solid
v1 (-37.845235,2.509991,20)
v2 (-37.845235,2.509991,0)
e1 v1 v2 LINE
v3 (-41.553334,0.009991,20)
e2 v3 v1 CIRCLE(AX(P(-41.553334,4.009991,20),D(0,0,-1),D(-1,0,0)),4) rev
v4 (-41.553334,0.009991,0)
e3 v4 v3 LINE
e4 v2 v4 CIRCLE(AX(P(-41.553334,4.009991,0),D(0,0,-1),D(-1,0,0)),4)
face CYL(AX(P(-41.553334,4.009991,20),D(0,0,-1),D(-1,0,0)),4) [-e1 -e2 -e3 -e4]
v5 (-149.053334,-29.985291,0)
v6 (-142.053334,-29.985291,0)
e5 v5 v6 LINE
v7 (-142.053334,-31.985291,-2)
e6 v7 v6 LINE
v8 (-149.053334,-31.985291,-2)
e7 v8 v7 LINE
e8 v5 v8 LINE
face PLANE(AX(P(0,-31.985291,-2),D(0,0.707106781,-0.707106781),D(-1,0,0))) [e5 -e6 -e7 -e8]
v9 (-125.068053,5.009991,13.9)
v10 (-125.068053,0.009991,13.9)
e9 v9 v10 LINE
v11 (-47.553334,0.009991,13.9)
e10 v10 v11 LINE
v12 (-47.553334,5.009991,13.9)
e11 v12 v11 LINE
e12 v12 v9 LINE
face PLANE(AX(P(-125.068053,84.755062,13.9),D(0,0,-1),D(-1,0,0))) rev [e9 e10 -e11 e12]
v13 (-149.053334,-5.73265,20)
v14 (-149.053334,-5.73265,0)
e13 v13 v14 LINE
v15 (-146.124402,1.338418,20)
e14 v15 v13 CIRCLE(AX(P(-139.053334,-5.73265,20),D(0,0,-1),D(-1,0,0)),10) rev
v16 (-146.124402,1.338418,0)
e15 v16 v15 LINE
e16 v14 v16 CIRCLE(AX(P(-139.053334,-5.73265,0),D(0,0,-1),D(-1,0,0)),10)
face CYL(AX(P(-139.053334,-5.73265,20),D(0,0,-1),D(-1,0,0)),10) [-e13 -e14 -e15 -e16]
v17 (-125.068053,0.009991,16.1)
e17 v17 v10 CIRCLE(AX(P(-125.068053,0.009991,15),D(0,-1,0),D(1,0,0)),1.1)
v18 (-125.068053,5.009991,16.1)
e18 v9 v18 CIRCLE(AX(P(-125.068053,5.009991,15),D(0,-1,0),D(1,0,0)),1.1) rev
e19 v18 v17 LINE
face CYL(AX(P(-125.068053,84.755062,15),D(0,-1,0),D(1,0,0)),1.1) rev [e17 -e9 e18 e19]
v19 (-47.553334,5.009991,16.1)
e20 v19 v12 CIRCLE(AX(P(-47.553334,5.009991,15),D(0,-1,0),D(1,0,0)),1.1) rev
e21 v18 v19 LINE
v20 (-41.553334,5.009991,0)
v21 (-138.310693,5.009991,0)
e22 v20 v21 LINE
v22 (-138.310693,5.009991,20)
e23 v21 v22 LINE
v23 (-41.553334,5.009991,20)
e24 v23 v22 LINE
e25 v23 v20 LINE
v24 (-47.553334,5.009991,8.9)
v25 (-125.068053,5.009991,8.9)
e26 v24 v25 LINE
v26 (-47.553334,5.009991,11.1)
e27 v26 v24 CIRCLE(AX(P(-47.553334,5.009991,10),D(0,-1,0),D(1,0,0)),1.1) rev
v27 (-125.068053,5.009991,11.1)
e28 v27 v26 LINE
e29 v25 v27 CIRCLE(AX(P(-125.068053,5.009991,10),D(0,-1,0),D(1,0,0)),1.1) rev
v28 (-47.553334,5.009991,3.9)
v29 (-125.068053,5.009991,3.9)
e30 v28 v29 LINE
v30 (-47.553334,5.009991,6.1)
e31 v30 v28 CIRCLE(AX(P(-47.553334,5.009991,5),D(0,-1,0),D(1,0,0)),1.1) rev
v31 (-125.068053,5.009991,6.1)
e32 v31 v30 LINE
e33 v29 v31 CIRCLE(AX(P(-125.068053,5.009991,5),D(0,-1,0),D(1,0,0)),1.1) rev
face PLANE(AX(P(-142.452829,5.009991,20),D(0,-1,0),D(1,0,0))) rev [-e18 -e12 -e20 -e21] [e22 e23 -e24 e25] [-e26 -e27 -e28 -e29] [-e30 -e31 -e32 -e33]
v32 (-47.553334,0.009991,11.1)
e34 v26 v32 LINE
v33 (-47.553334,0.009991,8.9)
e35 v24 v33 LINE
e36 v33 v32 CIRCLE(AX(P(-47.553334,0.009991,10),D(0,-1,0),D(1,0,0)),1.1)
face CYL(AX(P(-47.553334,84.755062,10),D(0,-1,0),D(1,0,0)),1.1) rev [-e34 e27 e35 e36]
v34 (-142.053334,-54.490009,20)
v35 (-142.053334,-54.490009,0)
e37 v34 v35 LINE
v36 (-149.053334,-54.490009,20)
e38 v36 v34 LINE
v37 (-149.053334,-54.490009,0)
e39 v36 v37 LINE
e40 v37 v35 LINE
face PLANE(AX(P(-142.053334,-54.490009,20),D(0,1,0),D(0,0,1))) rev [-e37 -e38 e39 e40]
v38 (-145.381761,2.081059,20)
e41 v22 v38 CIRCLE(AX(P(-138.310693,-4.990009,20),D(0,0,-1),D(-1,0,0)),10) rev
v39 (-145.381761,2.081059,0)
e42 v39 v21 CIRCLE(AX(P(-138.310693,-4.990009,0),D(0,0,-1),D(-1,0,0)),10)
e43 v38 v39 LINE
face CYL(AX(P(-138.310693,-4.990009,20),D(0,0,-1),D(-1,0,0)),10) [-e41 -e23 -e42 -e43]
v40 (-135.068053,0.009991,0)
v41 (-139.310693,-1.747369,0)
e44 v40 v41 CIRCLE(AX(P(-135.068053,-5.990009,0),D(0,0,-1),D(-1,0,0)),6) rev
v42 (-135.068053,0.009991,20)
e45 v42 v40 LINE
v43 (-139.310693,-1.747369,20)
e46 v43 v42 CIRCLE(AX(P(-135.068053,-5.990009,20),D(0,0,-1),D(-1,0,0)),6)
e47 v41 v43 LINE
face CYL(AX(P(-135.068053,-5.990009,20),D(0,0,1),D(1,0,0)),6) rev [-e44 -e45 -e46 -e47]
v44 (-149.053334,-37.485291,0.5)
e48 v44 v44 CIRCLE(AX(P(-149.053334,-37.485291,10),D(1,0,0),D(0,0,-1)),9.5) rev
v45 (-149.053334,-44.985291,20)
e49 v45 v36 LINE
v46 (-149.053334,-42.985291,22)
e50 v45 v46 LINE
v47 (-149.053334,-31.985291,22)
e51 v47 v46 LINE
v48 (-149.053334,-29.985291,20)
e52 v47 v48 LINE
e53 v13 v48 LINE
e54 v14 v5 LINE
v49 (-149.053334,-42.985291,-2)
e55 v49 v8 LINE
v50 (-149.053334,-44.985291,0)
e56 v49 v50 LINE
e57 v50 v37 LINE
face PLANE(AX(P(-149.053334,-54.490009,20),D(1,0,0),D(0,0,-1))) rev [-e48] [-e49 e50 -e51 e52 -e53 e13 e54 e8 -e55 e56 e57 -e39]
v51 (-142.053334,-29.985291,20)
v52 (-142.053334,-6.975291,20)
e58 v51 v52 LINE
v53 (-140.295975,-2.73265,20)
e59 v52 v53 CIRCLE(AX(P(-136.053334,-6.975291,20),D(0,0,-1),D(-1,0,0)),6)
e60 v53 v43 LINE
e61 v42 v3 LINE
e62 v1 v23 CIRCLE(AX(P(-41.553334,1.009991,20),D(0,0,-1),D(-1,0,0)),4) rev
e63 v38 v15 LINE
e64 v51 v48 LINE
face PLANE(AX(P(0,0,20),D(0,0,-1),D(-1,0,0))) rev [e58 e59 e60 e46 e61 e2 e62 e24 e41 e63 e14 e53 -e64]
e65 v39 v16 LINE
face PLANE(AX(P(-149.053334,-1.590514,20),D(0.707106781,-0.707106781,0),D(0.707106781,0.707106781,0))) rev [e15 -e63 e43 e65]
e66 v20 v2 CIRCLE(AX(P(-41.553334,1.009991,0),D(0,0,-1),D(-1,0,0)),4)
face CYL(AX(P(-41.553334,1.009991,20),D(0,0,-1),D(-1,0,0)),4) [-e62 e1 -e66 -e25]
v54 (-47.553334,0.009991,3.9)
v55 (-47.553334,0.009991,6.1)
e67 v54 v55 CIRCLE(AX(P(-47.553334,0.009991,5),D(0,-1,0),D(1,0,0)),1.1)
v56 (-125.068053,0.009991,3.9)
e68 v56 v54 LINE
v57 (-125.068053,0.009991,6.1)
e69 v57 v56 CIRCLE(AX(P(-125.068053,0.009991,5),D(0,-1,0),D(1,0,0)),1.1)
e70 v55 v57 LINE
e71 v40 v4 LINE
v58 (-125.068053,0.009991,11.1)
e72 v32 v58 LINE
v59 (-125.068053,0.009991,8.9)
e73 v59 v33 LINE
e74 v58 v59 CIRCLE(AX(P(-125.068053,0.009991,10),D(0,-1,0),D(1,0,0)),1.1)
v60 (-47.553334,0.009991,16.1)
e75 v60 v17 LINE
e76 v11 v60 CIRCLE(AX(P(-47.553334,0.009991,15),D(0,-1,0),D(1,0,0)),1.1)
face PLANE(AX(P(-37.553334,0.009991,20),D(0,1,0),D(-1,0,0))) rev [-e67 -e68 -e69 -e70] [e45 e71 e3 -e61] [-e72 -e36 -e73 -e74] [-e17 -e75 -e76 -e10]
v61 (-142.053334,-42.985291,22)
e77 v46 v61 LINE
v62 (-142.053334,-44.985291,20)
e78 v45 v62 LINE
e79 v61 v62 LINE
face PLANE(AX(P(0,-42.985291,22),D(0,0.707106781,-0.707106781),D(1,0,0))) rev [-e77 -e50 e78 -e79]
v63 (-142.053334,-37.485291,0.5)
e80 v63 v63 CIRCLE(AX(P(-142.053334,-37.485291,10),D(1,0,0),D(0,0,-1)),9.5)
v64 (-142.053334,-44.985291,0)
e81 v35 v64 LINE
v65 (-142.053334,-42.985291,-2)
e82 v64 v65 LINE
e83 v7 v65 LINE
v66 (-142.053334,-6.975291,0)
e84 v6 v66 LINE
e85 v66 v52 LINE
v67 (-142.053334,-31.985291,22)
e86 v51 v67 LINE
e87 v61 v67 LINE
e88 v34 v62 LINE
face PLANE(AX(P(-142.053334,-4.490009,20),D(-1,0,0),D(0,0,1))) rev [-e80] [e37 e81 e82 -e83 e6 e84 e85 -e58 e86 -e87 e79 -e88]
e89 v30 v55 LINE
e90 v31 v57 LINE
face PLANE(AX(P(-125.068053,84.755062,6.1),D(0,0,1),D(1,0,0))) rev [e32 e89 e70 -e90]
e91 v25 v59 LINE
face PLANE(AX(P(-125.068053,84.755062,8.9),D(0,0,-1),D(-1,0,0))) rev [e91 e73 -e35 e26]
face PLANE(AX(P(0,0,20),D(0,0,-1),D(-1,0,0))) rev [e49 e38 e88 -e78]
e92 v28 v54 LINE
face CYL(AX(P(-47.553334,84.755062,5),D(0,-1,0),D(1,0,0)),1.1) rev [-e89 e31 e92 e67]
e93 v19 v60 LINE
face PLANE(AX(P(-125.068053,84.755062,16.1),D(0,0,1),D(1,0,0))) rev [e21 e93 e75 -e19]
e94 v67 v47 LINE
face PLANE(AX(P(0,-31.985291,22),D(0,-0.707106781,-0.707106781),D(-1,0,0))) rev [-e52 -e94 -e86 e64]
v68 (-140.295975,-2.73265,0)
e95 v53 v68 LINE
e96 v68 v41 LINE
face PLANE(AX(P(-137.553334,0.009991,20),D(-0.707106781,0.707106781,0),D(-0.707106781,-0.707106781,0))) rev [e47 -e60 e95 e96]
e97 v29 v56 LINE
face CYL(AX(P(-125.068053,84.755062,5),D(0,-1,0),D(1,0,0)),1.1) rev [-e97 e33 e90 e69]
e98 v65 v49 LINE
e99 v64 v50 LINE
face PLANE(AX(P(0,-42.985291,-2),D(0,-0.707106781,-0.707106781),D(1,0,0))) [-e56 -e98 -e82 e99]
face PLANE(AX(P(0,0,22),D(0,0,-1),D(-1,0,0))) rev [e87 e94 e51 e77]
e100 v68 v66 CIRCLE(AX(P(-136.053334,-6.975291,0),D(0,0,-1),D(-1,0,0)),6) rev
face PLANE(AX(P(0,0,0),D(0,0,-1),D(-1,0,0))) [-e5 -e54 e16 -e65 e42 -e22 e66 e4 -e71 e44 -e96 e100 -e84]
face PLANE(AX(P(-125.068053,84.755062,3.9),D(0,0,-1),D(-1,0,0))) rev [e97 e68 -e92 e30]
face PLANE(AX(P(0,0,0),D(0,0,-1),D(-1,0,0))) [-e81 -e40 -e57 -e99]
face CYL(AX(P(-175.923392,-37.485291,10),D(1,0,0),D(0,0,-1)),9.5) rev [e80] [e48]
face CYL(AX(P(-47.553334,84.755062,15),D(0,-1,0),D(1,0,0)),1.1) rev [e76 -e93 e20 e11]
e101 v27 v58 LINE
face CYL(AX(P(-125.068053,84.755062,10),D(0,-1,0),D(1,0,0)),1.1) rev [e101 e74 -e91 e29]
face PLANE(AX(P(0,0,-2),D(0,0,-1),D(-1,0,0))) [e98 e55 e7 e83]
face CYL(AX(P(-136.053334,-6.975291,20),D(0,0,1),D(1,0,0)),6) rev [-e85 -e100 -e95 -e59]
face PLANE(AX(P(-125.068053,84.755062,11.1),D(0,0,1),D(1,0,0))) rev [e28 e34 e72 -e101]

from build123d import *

# Parameters (mm, degrees)
BOSS_EXTRUDE1_DEPTH = 20
FILLET1_R           = 6
SKETCH5_W           = 7
SKETCH5_H           = 15
BOSS_EXTRUDE3_DEPTH = 2
CUT_EXTRUDE1_DEPTH  = 5
SKETCH3_R           = 9.5
CUT_EXTRUDE2_DEPTH  = 7
SKETCH6_W           = 7
SKETCH6_H           = 15
BOSS_EXTRUDE4_DEPTH = 2
FILLET3_R           = 4
FILLET2_R           = 10
CHAMFER1_SIZE       = 2


# Some blends are built 0.0001 mm under size
with BuildPart() as part:
    # Sketch1 → Boss-Extrude1 (new body)
    with BuildSketch(Plane.XY):
        Polygon((-37.553334028, 5.009990716), (-37.553334028, 0.009990716), (-137.553334028, 0.009990716), (-142.053334028, -4.490009284), (-142.053334028, -54.490009284), (-149.053334028, -54.490009284), (-149.053334028, -1.590514347), (-142.452828965, 5.009990716), align=None)
    extrude(amount=BOSS_EXTRUDE1_DEPTH)

    # Fillet1
    fillet1_edges = [part.edges().sort_by_distance(p)[0] for p in [
        (-137.553334028, 0.009990716, 10),
        (-142.053334028, -4.490009284, 10),
    ]]
    fillet(fillet1_edges, radius=FILLET1_R)

    # Sketch5 → Boss-Extrude3 (add)
    with BuildSketch(Plane.XY.offset(20)):
        with Locations((-145.553334028, -37.485290658)):
            Rectangle(SKETCH5_W, SKETCH5_H)
    extrude(amount=BOSS_EXTRUDE3_DEPTH)

    # Sketch2 → Cut-Extrude1 (cut)
    with BuildSketch(Plane(origin=(0, 0.009990716, 0), x_dir=(-1, 0, 0), z_dir=(0, -1, 0))):
        with BuildLine():
            Line((125.068052654, -11.1), (47.553334028, -11.1))
            ThreePointArc((47.553334028, -11.1), (46.453334028, -10), (47.553334028, -8.9))
            Line((47.553334028, -8.9), (125.068052654, -8.9))
            ThreePointArc((125.068052654, -8.9), (126.168052654, -10), (125.068052654, -11.1))
        make_face()
        with BuildLine():
            Line((125.068052654, -3.9), (47.553334028, -3.9))
            ThreePointArc((47.553334028, -3.9), (46.453334028, -5), (47.553334028, -6.1))
            Line((47.553334028, -6.1), (125.068052654, -6.1))
            ThreePointArc((125.068052654, -6.1), (126.168052654, -5), (125.068052654, -3.9))
        make_face()
        with BuildLine():
            Line((125.068052654, -16.1), (47.553334028, -16.1))
            ThreePointArc((47.553334028, -16.1), (46.453334028, -15), (47.553334028, -13.9))
            Line((47.553334028, -13.9), (125.068052654, -13.9))
            ThreePointArc((125.068052654, -13.9), (126.168052654, -15), (125.068052654, -16.1))
        make_face()
    extrude(amount=-CUT_EXTRUDE1_DEPTH, mode=Mode.SUBTRACT)

    # Sketch3 → Cut-Extrude2 (cut)
    with BuildSketch(Plane(origin=(-142.053334028, 0, 0), x_dir=(0, 0, -1), z_dir=(1, 0, 0))):
        with Locations((-10, -37.485290658)):
            Circle(SKETCH3_R)
    extrude(amount=-CUT_EXTRUDE2_DEPTH, mode=Mode.SUBTRACT)

    # Sketch6 → Boss-Extrude4 (add)
    with BuildSketch(Plane(origin=(0, 0, 0), x_dir=(-1, 0, 0), z_dir=(0, 0, -1))):
        with Locations((145.553334028, -37.485290658)):
            Rectangle(SKETCH6_W, SKETCH6_H)
    extrude(amount=BOSS_EXTRUDE4_DEPTH)

    # Fillet3
    # the kernel refuses this fillet: 4 mm, written as the material it takes off along each edge
    with BuildSketch(Plane(origin=(-37.553334028, 5.009990716, -10), x_dir=(0, -1, 0), z_dir=(0, 0, 1)), Plane(origin=(-37.553334028, 0.009990716, -10), x_dir=(-1, 0, 0), z_dir=(0, 0, 1))) as fillet3_piece_1:
        with BuildLine():
            CenterArc((FILLET3_R, -FILLET3_R), FILLET3_R, 90, 90)
            Line((0, -FILLET3_R), (0, 0))
            Line((0, 0), (FILLET3_R, 0))
        make_face()
    extrude(amount=40, mode=Mode.SUBTRACT)

    # Fillet2
    fillet2_edges = [part.edges().sort_by_distance(p)[0] for p in [
        (-149.053334028, -1.590514347, 10),
        (-142.452828965, 5.009990716, 10),
    ]]
    fillet(fillet2_edges, radius=FILLET2_R)

    # Chamfer1
    chamfer1_edges = [part.edges().sort_by_distance(p)[0] for p in [
        (-145.553334028, -29.985290658, 22),
        (-145.553334028, -44.985290658, 22),
        (-145.553334028, -29.985290658, -2),
        (-145.553334028, -44.985290658, -2),
    ]]
    chamfer(chamfer1_edges, length=CHAMFER1_SIZE - 0.0001)  # a hair under: the kernel refuses the full size


solid = part.part
